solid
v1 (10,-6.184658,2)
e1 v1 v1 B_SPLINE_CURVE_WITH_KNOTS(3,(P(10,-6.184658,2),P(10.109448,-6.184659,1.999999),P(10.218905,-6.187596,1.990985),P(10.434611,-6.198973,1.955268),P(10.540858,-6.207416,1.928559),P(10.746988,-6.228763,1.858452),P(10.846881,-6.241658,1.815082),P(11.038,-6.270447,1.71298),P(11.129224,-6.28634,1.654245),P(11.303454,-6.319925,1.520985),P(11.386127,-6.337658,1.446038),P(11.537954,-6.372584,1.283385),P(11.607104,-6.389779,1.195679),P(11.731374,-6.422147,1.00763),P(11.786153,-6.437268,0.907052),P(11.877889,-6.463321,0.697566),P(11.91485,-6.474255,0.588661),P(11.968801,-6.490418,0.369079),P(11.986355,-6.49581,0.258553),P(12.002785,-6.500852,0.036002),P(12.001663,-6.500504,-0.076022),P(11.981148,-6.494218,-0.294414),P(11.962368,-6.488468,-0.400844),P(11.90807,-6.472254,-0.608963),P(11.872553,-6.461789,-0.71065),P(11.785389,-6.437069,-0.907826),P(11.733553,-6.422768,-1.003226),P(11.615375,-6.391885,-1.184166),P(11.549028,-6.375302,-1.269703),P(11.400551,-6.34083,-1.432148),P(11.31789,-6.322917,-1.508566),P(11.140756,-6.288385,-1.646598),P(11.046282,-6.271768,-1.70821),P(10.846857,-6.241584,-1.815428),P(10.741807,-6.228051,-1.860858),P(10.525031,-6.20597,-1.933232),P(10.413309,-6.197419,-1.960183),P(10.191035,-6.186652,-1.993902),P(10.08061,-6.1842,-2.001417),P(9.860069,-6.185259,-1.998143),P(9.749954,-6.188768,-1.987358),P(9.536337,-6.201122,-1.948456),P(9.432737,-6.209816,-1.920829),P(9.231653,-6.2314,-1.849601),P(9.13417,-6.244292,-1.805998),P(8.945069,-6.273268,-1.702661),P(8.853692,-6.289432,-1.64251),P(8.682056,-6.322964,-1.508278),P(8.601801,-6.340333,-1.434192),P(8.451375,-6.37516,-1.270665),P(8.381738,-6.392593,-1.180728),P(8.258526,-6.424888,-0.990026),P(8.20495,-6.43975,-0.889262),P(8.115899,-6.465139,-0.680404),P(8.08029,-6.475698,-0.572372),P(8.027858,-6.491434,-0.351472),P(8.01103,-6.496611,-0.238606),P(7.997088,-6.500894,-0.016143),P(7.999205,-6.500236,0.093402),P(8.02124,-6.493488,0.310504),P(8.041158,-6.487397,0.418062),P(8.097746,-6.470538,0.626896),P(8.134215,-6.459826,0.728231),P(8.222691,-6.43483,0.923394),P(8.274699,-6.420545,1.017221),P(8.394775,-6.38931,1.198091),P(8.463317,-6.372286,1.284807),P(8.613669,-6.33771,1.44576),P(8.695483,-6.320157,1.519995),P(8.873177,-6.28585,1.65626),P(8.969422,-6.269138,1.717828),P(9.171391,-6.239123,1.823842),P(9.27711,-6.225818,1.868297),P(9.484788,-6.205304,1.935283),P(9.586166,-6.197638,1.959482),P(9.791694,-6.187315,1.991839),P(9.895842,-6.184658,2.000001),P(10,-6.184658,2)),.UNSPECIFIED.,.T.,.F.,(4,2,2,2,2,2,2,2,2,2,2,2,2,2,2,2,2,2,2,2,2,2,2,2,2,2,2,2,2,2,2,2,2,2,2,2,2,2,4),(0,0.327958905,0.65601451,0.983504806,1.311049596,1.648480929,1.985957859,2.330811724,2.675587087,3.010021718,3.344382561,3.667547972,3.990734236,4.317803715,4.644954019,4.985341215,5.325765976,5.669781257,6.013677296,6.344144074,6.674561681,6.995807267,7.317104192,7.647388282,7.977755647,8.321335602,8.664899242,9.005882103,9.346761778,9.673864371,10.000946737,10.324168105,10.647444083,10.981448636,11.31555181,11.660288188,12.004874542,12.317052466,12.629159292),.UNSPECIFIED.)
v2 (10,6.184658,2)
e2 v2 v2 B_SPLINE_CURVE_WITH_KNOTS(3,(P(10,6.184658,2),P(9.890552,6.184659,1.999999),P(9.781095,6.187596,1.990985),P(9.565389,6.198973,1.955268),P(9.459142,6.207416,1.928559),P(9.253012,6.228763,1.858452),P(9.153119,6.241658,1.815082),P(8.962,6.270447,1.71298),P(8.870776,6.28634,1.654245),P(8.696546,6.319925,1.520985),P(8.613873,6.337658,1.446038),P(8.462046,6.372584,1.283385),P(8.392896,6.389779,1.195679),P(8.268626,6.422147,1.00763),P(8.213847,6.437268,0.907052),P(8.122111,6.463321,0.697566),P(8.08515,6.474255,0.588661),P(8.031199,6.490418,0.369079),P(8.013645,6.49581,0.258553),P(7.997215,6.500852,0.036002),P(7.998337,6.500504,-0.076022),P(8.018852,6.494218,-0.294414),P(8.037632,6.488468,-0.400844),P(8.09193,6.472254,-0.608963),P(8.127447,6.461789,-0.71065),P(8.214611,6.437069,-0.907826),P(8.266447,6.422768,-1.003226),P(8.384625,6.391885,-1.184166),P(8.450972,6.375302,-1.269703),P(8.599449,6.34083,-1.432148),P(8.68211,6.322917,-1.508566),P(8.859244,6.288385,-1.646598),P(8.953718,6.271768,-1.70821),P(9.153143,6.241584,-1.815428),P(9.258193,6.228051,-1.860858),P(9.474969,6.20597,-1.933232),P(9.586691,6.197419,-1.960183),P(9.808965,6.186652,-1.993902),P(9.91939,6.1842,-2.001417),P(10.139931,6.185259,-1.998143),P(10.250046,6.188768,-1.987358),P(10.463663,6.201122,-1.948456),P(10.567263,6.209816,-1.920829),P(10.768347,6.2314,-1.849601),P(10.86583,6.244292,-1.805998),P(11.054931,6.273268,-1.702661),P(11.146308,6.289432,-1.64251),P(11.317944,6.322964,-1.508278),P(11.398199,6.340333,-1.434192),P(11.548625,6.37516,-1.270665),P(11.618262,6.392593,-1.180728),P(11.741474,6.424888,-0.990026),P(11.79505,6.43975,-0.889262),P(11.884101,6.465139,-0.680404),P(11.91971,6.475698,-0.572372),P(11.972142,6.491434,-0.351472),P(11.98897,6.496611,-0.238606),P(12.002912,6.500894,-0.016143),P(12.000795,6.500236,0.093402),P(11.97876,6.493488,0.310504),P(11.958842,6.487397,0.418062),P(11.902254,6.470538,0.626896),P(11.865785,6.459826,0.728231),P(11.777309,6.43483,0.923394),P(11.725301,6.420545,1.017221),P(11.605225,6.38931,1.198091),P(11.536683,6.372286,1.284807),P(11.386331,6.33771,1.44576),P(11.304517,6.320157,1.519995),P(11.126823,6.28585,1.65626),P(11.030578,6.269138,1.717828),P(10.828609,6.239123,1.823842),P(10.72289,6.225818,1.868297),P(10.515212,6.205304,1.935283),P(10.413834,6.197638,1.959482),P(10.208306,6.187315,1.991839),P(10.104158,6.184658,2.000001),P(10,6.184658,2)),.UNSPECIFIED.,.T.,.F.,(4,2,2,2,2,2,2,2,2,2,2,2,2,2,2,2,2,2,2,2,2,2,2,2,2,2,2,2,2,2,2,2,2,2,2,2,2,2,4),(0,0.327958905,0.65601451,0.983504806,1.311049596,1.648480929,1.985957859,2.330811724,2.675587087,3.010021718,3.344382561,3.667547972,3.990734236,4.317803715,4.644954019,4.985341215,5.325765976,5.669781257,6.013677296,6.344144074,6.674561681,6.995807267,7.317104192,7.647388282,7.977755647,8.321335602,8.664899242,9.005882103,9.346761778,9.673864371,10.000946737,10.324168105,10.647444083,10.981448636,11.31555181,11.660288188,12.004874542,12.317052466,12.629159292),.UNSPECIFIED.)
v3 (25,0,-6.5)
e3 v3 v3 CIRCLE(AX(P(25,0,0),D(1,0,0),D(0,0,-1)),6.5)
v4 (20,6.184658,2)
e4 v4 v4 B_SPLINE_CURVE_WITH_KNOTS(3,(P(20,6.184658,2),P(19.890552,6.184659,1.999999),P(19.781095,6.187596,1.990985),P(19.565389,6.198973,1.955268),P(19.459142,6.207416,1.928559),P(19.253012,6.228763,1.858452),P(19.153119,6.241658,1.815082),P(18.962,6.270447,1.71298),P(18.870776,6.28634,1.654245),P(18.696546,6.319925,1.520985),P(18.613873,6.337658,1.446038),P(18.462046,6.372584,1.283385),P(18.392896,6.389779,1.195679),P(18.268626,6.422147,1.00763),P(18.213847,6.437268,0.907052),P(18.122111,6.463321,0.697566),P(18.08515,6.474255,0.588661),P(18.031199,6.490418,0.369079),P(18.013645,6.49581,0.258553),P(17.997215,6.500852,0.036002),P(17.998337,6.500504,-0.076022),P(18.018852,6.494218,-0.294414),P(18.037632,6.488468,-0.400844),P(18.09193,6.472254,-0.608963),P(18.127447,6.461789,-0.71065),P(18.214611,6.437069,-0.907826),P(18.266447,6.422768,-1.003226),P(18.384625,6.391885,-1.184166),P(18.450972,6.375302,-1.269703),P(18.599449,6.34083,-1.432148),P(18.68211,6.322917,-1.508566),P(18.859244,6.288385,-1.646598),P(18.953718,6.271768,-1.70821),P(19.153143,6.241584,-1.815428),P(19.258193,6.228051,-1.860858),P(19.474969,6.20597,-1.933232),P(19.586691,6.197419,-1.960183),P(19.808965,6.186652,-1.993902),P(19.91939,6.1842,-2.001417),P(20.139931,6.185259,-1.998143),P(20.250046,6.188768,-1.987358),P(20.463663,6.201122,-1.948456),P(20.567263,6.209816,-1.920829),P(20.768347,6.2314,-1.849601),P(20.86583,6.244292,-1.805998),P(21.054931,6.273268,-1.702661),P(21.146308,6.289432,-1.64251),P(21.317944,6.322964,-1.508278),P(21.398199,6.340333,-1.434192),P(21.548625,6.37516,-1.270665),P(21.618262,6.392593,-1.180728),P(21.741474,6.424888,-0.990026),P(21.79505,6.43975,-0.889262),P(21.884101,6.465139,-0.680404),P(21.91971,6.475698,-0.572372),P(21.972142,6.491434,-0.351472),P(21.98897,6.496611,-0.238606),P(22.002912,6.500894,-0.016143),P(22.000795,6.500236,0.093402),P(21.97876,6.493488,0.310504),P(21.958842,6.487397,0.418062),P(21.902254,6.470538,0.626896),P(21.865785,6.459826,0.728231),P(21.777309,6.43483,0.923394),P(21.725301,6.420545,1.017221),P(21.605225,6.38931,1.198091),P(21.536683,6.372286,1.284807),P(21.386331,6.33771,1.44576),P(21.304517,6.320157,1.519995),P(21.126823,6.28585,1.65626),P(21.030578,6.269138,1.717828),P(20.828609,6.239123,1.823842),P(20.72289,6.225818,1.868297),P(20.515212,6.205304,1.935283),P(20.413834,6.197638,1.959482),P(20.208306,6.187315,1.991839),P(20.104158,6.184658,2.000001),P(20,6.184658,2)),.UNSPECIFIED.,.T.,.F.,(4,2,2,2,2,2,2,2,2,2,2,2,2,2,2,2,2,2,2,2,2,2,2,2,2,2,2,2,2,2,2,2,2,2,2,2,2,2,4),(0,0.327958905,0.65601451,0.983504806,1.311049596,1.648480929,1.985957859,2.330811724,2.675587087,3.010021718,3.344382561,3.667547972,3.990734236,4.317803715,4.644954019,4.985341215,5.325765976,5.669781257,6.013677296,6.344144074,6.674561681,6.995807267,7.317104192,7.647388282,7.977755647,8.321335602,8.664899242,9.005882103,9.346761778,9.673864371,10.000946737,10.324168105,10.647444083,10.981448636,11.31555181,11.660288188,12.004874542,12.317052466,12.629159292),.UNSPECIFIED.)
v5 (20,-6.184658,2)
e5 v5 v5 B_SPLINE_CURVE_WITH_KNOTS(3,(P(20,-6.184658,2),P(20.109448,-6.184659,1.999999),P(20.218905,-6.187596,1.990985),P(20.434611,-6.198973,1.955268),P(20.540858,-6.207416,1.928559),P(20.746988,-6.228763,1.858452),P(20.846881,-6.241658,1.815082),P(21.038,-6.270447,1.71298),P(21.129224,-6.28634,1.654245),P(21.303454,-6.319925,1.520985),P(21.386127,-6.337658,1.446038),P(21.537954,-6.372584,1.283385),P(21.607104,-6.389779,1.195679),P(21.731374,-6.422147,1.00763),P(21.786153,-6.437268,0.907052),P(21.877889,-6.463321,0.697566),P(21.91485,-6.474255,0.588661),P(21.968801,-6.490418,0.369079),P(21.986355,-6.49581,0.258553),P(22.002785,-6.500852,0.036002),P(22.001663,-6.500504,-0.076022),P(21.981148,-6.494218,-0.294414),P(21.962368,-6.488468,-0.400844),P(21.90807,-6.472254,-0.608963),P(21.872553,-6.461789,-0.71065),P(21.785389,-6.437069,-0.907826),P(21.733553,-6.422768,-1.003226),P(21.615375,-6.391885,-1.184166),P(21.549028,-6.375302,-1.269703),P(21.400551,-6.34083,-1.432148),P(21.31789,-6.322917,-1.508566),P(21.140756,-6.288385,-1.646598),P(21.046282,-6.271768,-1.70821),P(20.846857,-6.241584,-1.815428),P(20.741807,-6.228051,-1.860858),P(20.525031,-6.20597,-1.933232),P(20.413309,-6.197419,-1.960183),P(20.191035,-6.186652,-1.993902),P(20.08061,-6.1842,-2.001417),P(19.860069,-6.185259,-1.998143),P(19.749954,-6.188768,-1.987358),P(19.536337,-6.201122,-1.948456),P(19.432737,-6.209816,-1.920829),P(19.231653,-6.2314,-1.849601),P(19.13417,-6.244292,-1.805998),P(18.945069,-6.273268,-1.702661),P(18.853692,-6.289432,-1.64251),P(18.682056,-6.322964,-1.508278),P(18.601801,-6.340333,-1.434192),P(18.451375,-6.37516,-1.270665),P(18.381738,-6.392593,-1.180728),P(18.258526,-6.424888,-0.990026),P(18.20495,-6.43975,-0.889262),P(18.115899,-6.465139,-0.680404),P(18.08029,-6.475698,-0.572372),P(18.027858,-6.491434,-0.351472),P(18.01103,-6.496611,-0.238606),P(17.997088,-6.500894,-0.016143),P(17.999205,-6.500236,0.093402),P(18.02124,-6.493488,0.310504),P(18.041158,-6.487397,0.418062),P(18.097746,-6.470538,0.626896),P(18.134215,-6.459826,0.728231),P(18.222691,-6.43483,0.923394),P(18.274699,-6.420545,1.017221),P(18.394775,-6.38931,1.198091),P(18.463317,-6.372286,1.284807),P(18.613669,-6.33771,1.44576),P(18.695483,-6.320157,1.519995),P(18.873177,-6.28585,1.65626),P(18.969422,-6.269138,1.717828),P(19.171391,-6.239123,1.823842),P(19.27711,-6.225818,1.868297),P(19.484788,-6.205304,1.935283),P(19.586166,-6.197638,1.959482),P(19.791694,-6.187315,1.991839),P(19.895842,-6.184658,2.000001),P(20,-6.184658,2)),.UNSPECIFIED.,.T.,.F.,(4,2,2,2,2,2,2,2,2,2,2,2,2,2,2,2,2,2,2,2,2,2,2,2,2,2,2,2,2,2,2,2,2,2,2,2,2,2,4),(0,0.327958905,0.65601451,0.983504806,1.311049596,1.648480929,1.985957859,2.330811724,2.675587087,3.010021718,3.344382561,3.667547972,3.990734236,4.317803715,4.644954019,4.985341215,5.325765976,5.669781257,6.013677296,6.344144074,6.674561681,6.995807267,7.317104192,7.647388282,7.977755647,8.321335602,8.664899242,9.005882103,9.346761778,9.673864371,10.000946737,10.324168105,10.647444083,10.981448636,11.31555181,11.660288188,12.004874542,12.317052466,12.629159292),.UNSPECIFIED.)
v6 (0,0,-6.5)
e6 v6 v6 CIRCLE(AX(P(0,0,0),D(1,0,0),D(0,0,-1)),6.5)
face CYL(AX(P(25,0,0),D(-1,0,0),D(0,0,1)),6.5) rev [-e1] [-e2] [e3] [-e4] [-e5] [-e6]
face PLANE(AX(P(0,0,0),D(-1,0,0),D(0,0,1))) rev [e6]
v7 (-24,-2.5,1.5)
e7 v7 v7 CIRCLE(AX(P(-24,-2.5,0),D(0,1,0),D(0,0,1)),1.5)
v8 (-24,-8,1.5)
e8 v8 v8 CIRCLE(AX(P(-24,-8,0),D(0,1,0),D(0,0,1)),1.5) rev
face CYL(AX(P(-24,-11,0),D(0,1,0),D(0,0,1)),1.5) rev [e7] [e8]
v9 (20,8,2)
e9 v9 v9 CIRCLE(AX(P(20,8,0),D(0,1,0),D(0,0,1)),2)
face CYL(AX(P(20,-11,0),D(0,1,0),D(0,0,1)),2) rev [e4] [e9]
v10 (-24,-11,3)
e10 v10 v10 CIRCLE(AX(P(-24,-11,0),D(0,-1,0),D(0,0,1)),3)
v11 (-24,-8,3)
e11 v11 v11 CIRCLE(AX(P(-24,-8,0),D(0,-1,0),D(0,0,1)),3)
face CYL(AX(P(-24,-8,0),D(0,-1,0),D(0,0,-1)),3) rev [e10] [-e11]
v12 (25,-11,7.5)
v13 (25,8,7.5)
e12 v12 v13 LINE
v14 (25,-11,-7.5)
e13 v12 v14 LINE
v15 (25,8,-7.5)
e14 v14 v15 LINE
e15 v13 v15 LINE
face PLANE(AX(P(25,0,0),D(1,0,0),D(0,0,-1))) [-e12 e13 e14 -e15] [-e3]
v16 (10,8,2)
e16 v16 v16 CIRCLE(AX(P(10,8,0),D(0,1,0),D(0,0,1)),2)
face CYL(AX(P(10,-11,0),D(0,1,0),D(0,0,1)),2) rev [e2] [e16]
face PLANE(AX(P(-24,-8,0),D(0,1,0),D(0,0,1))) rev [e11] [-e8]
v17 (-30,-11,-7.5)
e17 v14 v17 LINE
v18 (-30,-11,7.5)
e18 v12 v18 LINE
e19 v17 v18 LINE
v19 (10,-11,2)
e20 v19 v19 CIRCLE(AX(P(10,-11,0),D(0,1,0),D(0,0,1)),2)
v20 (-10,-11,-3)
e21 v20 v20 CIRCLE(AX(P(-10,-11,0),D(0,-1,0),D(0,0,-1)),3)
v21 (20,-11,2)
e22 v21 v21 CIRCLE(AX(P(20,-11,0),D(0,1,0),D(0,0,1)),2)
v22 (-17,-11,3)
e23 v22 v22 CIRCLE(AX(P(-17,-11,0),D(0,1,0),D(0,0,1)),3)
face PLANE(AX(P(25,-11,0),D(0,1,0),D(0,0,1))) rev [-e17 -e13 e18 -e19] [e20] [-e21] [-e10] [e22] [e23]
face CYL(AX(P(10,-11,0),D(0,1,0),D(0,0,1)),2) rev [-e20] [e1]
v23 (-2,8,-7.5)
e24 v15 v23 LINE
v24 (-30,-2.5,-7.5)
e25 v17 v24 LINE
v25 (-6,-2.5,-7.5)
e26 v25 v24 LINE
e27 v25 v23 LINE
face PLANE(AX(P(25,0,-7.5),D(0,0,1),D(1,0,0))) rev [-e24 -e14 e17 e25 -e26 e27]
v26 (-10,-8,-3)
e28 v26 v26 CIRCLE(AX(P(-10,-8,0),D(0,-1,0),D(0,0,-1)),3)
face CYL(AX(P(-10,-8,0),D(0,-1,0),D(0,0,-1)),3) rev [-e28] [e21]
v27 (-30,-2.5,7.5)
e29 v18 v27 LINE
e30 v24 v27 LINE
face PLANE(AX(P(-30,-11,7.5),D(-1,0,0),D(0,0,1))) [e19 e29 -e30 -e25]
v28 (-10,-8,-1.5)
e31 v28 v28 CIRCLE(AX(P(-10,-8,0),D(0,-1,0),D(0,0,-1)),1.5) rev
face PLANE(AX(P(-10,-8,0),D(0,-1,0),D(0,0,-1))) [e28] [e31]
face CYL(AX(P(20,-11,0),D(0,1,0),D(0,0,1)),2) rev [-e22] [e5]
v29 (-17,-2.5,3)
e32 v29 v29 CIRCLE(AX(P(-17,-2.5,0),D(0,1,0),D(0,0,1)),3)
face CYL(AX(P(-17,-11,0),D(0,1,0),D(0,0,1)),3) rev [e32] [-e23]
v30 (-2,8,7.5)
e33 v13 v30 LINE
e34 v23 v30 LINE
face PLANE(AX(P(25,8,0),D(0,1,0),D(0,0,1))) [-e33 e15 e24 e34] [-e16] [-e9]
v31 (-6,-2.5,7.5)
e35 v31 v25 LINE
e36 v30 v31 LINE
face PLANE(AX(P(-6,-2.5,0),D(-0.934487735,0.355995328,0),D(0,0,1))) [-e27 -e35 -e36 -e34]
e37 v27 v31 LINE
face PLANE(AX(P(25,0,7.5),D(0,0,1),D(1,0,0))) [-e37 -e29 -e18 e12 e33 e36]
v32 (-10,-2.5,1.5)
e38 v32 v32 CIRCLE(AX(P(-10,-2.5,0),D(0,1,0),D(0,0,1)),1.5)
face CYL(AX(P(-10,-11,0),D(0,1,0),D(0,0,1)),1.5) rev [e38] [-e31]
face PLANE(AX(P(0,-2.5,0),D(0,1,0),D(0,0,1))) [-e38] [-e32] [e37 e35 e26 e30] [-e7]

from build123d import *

# Parameters (mm, degrees)
SKETCH1_W               = 15
SKETCH1_H               = 19
SKETCH1_R               = 6.5
BOSS_EXTRUDE1_DEPTH     = 25
SKETCH2_W               = 15
SKETCH2_H               = 19
BOSS_EXTRUDE2_DEPTH     = 2
CUT_EXTRUDE1_DEPTH      = 29.324018077
CUT_EXTRUDE1_DEPTH_BACK = 29.324018077
SKETCH4_R               = 2
SKETCH3_W               = 28
SKETCH3_H               = 15
SKETCH3_R               = 3
BOSS_EXTRUDE3_DEPTH     = 8.5
CHAMFER1_SIZE2          = 10.5
CHAMFER1_SIZE           = 4
SKETCH6_R               = 1.5
CUT_EXTRUDE3_DEPTH      = 33.657311618
SKETCH7_R               = 3
CUT_EXTRUDE4_DEPTH      = 3


with BuildPart() as part:
    # Sketch1 → Boss-Extrude1 (new body)
    with BuildSketch(Plane(origin=(0, 0, 0), x_dir=(0, 0, -1), z_dir=(1, 0, 0))):
        with Locations((0, -1.5)):
            Rectangle(SKETCH1_W, SKETCH1_H)
        Circle(SKETCH1_R, mode=Mode.SUBTRACT)
    extrude(amount=BOSS_EXTRUDE1_DEPTH)

    # Sketch2 → Boss-Extrude2 (add)
    with BuildSketch(Plane(origin=(0, 0, 0), x_dir=(0, 0, -1), z_dir=(1, 0, 0))):
        with Locations((0, -1.5)):
            Rectangle(SKETCH2_W, SKETCH2_H)
    extrude(amount=-BOSS_EXTRUDE2_DEPTH)

    # Sketch4 → Cut-Extrude1 (cut, two sides: drawn at the far end of the back side and taken through both)
    with BuildSketch(Plane(origin=(0, 0, 0), x_dir=(1, 0, 0), z_dir=(0, 1, 0)).offset(-CUT_EXTRUDE1_DEPTH_BACK)):
        with Locations(Location((10, 0, 0), (0, 0, 270))):
            Circle(SKETCH4_R)
        with Locations(Location((20, 0, 0), (0, 0, 270))):
            Circle(SKETCH4_R)
    extrude(amount=CUT_EXTRUDE1_DEPTH + CUT_EXTRUDE1_DEPTH_BACK, mode=Mode.SUBTRACT)

    # Sketch3 → Boss-Extrude3 (add)
    with BuildSketch(Plane(origin=(0, -2.5, 0), x_dir=(1, 0, 0), z_dir=(0, 1, 0))):
        with Locations((-16, 0)):
            Rectangle(SKETCH3_W, SKETCH3_H)
        with Locations(Location((-17, 0, 0), (0, 0, 270))):
            Circle(SKETCH3_R, mode=Mode.SUBTRACT)
    extrude(amount=-BOSS_EXTRUDE3_DEPTH)

    # Chamfer1
    chamfer1_edges = [part.edges().sort_by_distance(p)[0] for p in [
        (-2, -2.5, 0),
    ]]
    chamfer1_side = [part.faces().sort_by_distance(p)[0] for p in [
        (-2.08, -2.5, 0),
    ]]
    chamfer(chamfer1_edges, length=CHAMFER1_SIZE - 0.0001, length2=CHAMFER1_SIZE2 - 0.0001, reference=chamfer1_side[0])  # a hair under: the kernel refuses the full size

    # Sketch6 → Cut-Extrude3 (cut, through all)
    with BuildSketch(Plane(origin=(0, -2.5, 0), x_dir=(1, 0, 0), z_dir=(0, 1, 0))):
        with Locations(Location((-24, 0, 0), (0, 0, 270))):
            Circle(SKETCH6_R)
        with Locations(Location((-10, 0, 0), (0, 0, 270))):
            Circle(SKETCH6_R)
    extrude(amount=-CUT_EXTRUDE3_DEPTH, mode=Mode.SUBTRACT)

    # Sketch7 → Cut-Extrude4 (cut)
    with BuildSketch(Plane.XZ.offset(11)):
        with Locations(Location((-10, 0, 0), (0, 0, 270))):
            Circle(SKETCH7_R)
        with Locations(Location((-24, 0, 0), (0, 0, 90))):
            Circle(SKETCH7_R)
    extrude(amount=-CUT_EXTRUDE4_DEPTH, mode=Mode.SUBTRACT)


solid = part.part
